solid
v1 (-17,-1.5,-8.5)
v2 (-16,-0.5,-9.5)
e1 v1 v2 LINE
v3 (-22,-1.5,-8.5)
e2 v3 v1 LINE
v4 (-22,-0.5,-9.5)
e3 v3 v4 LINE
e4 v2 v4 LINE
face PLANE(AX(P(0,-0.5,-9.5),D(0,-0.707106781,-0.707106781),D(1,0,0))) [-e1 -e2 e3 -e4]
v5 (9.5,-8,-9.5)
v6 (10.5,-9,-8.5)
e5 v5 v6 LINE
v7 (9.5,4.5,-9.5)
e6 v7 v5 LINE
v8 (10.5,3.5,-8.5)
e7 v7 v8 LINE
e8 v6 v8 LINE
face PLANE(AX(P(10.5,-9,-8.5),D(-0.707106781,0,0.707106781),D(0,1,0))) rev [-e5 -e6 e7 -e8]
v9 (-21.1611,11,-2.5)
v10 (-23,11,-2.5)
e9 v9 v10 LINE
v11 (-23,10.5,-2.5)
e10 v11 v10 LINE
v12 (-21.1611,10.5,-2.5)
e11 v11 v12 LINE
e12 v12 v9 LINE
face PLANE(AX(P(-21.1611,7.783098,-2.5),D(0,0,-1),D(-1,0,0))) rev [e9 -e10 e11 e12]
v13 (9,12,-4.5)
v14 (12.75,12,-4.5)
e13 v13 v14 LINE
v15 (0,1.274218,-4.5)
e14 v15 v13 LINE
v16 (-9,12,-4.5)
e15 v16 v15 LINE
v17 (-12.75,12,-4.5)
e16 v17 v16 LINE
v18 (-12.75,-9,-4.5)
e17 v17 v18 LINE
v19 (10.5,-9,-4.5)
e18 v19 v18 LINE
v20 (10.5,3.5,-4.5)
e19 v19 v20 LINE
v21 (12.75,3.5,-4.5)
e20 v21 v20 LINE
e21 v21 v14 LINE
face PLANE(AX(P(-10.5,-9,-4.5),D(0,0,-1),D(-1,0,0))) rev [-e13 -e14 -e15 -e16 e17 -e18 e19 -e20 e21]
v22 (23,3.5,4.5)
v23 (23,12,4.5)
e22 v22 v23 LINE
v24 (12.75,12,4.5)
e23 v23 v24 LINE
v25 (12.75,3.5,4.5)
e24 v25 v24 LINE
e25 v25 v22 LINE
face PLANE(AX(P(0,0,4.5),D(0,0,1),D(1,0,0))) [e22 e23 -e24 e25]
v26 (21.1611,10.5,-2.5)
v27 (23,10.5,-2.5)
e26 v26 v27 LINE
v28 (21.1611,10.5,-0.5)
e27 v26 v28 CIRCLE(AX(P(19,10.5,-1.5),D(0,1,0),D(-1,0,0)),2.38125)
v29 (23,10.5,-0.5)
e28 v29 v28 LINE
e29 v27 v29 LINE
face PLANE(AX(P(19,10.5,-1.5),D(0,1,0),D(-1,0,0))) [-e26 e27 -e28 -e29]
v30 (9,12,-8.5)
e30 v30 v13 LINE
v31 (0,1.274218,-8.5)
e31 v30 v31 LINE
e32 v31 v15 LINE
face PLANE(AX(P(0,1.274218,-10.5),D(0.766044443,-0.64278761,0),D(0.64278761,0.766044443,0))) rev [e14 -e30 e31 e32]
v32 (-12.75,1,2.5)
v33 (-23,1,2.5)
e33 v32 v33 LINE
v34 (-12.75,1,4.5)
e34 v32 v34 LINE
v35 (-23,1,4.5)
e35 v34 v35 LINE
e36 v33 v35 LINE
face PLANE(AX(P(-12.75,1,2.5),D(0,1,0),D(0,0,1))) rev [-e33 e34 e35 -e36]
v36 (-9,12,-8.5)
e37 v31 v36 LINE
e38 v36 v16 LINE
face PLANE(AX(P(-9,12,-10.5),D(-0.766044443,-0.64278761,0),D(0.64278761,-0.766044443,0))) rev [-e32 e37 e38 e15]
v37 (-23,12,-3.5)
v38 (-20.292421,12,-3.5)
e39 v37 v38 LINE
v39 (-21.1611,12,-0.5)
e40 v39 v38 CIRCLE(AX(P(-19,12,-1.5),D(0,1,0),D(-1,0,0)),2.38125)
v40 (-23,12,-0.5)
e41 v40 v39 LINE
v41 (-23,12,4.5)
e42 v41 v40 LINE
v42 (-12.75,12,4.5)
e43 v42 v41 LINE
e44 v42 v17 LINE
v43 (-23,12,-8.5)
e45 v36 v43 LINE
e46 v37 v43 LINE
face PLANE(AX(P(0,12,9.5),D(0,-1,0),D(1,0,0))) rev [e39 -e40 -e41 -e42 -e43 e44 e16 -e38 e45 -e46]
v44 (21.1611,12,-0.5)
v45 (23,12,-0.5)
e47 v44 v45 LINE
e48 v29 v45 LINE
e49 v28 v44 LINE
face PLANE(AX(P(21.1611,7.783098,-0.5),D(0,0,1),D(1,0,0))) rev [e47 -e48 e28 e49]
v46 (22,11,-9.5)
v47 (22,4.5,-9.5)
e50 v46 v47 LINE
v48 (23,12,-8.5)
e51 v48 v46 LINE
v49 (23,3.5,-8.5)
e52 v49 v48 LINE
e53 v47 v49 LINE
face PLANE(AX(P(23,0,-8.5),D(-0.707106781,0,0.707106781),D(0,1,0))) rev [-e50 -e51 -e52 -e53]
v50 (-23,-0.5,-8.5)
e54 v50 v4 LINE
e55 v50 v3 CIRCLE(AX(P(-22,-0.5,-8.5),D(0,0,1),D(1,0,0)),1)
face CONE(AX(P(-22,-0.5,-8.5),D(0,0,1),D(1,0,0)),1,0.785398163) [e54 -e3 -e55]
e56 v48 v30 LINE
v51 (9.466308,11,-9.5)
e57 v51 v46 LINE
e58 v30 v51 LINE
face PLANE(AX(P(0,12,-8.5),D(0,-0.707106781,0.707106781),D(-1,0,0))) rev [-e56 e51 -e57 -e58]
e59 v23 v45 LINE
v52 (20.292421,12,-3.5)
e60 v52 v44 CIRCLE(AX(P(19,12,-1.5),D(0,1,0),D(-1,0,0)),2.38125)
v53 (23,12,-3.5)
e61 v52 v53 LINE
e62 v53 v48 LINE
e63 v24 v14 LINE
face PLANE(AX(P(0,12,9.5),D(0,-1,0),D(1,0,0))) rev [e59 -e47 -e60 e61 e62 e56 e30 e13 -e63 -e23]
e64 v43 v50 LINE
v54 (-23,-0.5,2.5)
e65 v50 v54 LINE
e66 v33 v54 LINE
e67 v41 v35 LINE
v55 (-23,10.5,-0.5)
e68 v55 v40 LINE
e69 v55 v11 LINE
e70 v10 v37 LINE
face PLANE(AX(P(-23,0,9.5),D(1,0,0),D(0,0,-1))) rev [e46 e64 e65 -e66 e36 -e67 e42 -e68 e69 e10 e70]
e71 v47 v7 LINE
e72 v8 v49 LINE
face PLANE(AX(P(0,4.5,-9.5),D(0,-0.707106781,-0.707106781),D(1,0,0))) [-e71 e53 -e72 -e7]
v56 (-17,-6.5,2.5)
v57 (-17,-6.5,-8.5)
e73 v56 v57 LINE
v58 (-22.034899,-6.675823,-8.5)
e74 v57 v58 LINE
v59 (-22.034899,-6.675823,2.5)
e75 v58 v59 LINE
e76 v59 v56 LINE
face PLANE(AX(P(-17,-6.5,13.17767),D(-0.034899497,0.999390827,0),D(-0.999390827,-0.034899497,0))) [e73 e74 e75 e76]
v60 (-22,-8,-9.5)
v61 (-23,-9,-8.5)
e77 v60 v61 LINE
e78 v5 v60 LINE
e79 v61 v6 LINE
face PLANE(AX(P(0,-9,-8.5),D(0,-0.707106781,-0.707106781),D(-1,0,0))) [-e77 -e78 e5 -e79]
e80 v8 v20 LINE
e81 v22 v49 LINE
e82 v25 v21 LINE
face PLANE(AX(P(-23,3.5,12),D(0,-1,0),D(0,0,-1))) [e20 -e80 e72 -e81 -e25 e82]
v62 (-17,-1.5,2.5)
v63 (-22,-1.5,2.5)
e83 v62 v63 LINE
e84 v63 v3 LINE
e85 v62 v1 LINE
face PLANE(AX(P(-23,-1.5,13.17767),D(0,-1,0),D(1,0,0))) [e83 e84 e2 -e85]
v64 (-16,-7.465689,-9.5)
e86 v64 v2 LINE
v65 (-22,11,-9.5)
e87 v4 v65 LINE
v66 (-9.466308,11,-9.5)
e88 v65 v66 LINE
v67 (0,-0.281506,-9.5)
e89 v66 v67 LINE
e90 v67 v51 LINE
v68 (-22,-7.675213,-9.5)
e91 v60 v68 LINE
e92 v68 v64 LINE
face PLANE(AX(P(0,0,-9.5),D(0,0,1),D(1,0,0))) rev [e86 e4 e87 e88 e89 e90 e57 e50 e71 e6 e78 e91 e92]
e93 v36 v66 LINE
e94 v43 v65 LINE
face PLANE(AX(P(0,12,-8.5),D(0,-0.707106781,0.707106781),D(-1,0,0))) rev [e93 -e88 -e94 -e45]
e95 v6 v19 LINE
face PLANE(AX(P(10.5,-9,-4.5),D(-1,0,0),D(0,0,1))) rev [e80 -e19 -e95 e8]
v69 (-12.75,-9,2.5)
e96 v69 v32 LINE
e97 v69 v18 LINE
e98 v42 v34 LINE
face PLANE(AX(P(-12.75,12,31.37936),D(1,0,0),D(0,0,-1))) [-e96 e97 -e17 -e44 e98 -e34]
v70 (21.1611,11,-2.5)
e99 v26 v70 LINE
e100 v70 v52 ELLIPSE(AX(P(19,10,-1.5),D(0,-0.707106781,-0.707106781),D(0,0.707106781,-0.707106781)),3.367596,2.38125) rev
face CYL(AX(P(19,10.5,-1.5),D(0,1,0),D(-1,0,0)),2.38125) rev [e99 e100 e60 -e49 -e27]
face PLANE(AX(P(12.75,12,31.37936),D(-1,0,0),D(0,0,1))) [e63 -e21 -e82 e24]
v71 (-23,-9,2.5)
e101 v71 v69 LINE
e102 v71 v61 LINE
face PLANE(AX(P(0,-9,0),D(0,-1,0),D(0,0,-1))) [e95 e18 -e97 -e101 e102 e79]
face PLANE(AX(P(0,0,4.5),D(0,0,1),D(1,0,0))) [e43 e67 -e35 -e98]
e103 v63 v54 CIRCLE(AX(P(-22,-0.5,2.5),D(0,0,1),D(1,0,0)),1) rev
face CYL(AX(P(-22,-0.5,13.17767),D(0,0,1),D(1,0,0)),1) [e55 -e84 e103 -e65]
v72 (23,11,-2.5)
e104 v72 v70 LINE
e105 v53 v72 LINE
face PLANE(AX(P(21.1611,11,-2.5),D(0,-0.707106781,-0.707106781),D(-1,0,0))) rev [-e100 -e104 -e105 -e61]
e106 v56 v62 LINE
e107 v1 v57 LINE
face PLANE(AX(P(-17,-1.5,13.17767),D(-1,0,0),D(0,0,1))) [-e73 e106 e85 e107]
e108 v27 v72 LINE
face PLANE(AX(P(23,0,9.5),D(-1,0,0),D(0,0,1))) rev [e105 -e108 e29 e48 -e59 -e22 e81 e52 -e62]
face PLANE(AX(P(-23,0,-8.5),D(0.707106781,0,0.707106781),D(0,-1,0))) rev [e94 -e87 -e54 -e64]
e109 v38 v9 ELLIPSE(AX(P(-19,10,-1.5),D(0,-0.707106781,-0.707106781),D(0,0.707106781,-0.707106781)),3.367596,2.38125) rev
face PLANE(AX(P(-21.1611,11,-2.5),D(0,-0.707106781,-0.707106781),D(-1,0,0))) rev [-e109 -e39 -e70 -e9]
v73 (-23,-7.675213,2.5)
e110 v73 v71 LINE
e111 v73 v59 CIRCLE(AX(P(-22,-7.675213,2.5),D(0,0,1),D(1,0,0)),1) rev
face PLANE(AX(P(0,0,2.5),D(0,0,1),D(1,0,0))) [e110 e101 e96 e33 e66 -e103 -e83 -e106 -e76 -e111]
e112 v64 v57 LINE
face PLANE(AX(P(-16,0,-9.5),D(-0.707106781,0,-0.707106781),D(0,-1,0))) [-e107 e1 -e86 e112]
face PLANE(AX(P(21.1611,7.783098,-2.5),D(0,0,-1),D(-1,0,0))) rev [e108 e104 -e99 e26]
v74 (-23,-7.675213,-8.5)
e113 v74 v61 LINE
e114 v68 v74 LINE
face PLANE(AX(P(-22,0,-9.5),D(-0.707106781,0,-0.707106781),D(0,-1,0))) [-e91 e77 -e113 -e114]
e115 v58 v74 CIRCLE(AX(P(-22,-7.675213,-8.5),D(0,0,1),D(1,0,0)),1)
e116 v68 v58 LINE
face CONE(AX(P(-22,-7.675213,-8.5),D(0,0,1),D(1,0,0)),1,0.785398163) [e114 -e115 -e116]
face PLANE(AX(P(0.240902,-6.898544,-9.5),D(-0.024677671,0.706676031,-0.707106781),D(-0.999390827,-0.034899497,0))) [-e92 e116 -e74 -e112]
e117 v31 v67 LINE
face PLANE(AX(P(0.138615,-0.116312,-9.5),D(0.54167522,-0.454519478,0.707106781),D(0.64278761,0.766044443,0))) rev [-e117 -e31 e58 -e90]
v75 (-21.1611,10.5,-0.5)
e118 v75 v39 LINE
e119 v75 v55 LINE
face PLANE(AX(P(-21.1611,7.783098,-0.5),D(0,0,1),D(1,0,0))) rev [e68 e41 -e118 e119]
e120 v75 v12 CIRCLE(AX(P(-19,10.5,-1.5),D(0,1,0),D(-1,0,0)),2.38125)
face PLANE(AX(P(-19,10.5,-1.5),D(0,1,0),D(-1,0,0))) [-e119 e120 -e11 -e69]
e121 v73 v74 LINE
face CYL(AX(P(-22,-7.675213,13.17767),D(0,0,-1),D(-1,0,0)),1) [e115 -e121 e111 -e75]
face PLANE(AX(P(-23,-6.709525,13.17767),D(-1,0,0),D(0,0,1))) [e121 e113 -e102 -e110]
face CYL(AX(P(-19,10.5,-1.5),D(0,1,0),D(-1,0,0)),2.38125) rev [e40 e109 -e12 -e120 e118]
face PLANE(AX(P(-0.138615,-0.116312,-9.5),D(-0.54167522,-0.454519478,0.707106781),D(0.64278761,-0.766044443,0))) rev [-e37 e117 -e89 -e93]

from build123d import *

# Parameters (mm, degrees)
BOSS_EXTRUDE1_DEPTH = 9.5
SKETCH5_R           = 2.38125
CUT_EXTRUDE1_DEPTH  = 1.5
SKETCH9_W           = 21
SKETCH9_H           = 5
BOSS_EXTRUDE6_DEPTH = 9
SKETCH10_W          = 21
SKETCH10_H          = 14
CUT_EXTRUDE4_DEPTH  = 28.626979567
CUT_EXTRUDE5_DEPTH  = 5
SKETCH12_W          = 24
SKETCH12_H          = 9
BOSS_EXTRUDE7_DEPTH = 5
CUT_EXTRUDE6_DEPTH  = 6
SKETCH15_W          = 46
SKETCH15_H          = 3.5
CUT_EXTRUDE7_DEPTH  = 16.5
SKETCH16_W          = 12.5
SKETCH16_H          = 3.5
CUT_EXTRUDE8_DEPTH  = 16.5
BOSS_EXTRUDE8_DEPTH = 5
SKETCH18_W          = 25.5
SKETCH18_H          = 8.5
CUT_EXTRUDE9_DEPTH  = 9
BOSS_EXTRUDE9_DEPTH = 9
FILLET1_R           = 1
SKETCH20_W          = 10.25
SKETCH20_H          = 10
CUT_EXTRUDE10_DEPTH = 2
SKETCH23_W          = 1.838900381
SKETCH23_H          = 2
CUT_EXTRUDE11_DEPTH = 1.5
CHAMFER1_SIZE       = 1
CHAMFER2_SIZE       = 1


with BuildPart() as part:
    # Sketch2 → Boss-Extrude1 (new, symmetric)
    with BuildSketch(Plane.XY):
        Polygon((-12, 3), (-12, 12), (-23, 12), (-23, 0), (23, 0), (23, 12), (12, 12), (12, 3), align=None)
    extrude(amount=BOSS_EXTRUDE1_DEPTH, both=True)

    # Sketch5 → Cut-Extrude1 (cut)
    with BuildSketch(Plane(origin=(0, 12, 0), x_dir=(1, 0, 0), z_dir=(0, 1, 0))):
        with Locations(Location((-19, 1.5, 0), (0, 0, 180))):
            Circle(SKETCH5_R)
        with Locations(Location((19, 1.5, 0), (0, 0, 180))):
            Circle(SKETCH5_R)
    extrude(amount=-CUT_EXTRUDE1_DEPTH, mode=Mode.SUBTRACT)

    # Sketch9 → Boss-Extrude6 (add)
    with BuildSketch(Plane.XZ):
        with Locations((0, -7)):
            Rectangle(SKETCH9_W, SKETCH9_H)
    extrude(amount=BOSS_EXTRUDE6_DEPTH)

    # Sketch10 → Cut-Extrude4 (cut, through all)
    with BuildSketch(Plane.XZ):
        with Locations((0, 2.5)):
            Rectangle(SKETCH10_W, SKETCH10_H)
    extrude(amount=-CUT_EXTRUDE4_DEPTH, mode=Mode.SUBTRACT)

    # Sketch11 → Cut-Extrude5 (cut)
    with BuildSketch(Plane.XY.offset(9.5)):
        Polygon((10.5, 3), (10.5, 0), (23, 0), (23, 12), (12, 12), (12, 3), align=None)
        Polygon((-10.5, 0), (-10.5, 3), (-12, 3), (-12, 12), (-23, 12), (-23, 0), align=None)
    extrude(amount=-CUT_EXTRUDE5_DEPTH, mode=Mode.SUBTRACT)

    # Sketch12 → Boss-Extrude7 (add)
    with BuildSketch(Plane(origin=(0, 0, -9.5), x_dir=(-1, 0, 0), z_dir=(0, 0, -1))):
        with Locations((0, 7.5)):
            Rectangle(SKETCH12_W, SKETCH12_H)
    extrude(amount=-BOSS_EXTRUDE7_DEPTH)

    # Sketch13 → Cut-Extrude6 (cut)
    with BuildSketch(Plane.XY.offset(-4.5)):
        Polygon((-9, 12), (0, 1.274217667), (9, 12), align=None)
    extrude(amount=-CUT_EXTRUDE6_DEPTH, mode=Mode.SUBTRACT)

    # Sketch15 → Cut-Extrude7 (cut)
    with BuildSketch(Plane.XY.offset(-4.5)):
        with Locations((0, 1.75)):
            Rectangle(SKETCH15_W, SKETCH15_H)
    extrude(amount=CUT_EXTRUDE7_DEPTH, mode=Mode.SUBTRACT)

    # Sketch16 → Cut-Extrude8 (cut)
    with BuildSketch(Plane.XY.offset(-4.5)):
        with Locations((-16.75, 1.75)):
            Rectangle(SKETCH16_W, SKETCH16_H)
        with Locations((16.75, 1.75)):
            Rectangle(SKETCH16_W, SKETCH16_H)
    extrude(amount=-CUT_EXTRUDE8_DEPTH, mode=Mode.SUBTRACT)

    # Sketch17 → Boss-Extrude8 (add)
    with BuildSketch(Plane(origin=(0, 0, -9.5), x_dir=(-1, 0, 0), z_dir=(0, 0, -1))):
        Polygon((10.5, 3.5), (23, 3.5), (23, -1.5), (17, -1.5), (17, -6.5), (23, -6.709524617), (23, -9), (10.5, -9), align=None)
    extrude(amount=-BOSS_EXTRUDE8_DEPTH)

    # Sketch18 → Cut-Extrude9 (cut)
    with BuildSketch(Plane.XY.offset(-4.5)):
        with Locations((0, 7.75)):
            Rectangle(SKETCH18_W, SKETCH18_H)
    extrude(amount=CUT_EXTRUDE9_DEPTH, mode=Mode.SUBTRACT)

    # Sketch19 → Boss-Extrude9 (add)
    with BuildSketch(Plane.XY.offset(-4.5)):
        Polygon((-12.75, 3.5), (-23, 3.5), (-23, -1.5), (-17, -1.5), (-17, -6.5), (-23, -6.709524617), (-23, -9), (-12.75, -9), align=None)
    extrude(amount=BOSS_EXTRUDE9_DEPTH)

    # Fillet1
    fillet1_edges = [part.edges().sort_by_distance(p)[0] for p in [
        (-23, -1.5, -2.5),
        (-23, -6.709524617, -2.5),
    ]]
    fillet(fillet1_edges, radius=FILLET1_R)

    # Sketch20 → Cut-Extrude10 (cut)
    with BuildSketch(Plane.XY.offset(4.5)):
        with Locations((-17.875, -4)):
            Rectangle(SKETCH20_W, SKETCH20_H)
    extrude(amount=-CUT_EXTRUDE10_DEPTH, mode=Mode.SUBTRACT)

    # Sketch23 → Cut-Extrude11 (cut)
    with BuildSketch(Plane(origin=(0, 12, 0), x_dir=(1, 0, 0), z_dir=(0, 1, 0))):
        with Locations((-22.080549809, 1.5)):
            Rectangle(SKETCH23_W, SKETCH23_H)
        with Locations((22.080549809, 1.5)):
            Rectangle(SKETCH23_W, SKETCH23_H)
    extrude(amount=-CUT_EXTRUDE11_DEPTH, mode=Mode.SUBTRACT)

    # Chamfer1
    chamfer1_edges = [part.edges().sort_by_distance(p)[0] for p in [
        (-22.080549809, 12, -2.5),
        (22.080549809, 12, -2.5),
    ]]
    chamfer(chamfer1_edges, length=CHAMFER1_SIZE)

    # Chamfer2
    chamfer2_edges = [part.edges().sort_by_distance(p)[0] for p in [
        (16, 12, -9.5),
        (-16, 12, -9.5),
        (4.5, 6.637108833, -9.5),
        (-4.5, 6.637108833, -9.5),
        (23, 7.75, -9.5),
        (16.75, 3.5, -9.5),
        (-23, -8.337606696, -9.5),
        (-17, -4, -9.5),
        (-19.5, -1.5, -9.5),
        (-19.517449748, -6.587911282, -9.5),
        (-22.7193398, -6.980555021, -9.5),
        (-22.707106781, -1.207106781, -9.5),
        (10.5, -2.75, -9.5),
        (-6.25, -9, -9.5),
        (-23, 5.75, -9.5),
    ]]
    chamfer(chamfer2_edges, length=CHAMFER2_SIZE - 0.0001)  # a hair under: the kernel refuses the full size


solid = part.part
